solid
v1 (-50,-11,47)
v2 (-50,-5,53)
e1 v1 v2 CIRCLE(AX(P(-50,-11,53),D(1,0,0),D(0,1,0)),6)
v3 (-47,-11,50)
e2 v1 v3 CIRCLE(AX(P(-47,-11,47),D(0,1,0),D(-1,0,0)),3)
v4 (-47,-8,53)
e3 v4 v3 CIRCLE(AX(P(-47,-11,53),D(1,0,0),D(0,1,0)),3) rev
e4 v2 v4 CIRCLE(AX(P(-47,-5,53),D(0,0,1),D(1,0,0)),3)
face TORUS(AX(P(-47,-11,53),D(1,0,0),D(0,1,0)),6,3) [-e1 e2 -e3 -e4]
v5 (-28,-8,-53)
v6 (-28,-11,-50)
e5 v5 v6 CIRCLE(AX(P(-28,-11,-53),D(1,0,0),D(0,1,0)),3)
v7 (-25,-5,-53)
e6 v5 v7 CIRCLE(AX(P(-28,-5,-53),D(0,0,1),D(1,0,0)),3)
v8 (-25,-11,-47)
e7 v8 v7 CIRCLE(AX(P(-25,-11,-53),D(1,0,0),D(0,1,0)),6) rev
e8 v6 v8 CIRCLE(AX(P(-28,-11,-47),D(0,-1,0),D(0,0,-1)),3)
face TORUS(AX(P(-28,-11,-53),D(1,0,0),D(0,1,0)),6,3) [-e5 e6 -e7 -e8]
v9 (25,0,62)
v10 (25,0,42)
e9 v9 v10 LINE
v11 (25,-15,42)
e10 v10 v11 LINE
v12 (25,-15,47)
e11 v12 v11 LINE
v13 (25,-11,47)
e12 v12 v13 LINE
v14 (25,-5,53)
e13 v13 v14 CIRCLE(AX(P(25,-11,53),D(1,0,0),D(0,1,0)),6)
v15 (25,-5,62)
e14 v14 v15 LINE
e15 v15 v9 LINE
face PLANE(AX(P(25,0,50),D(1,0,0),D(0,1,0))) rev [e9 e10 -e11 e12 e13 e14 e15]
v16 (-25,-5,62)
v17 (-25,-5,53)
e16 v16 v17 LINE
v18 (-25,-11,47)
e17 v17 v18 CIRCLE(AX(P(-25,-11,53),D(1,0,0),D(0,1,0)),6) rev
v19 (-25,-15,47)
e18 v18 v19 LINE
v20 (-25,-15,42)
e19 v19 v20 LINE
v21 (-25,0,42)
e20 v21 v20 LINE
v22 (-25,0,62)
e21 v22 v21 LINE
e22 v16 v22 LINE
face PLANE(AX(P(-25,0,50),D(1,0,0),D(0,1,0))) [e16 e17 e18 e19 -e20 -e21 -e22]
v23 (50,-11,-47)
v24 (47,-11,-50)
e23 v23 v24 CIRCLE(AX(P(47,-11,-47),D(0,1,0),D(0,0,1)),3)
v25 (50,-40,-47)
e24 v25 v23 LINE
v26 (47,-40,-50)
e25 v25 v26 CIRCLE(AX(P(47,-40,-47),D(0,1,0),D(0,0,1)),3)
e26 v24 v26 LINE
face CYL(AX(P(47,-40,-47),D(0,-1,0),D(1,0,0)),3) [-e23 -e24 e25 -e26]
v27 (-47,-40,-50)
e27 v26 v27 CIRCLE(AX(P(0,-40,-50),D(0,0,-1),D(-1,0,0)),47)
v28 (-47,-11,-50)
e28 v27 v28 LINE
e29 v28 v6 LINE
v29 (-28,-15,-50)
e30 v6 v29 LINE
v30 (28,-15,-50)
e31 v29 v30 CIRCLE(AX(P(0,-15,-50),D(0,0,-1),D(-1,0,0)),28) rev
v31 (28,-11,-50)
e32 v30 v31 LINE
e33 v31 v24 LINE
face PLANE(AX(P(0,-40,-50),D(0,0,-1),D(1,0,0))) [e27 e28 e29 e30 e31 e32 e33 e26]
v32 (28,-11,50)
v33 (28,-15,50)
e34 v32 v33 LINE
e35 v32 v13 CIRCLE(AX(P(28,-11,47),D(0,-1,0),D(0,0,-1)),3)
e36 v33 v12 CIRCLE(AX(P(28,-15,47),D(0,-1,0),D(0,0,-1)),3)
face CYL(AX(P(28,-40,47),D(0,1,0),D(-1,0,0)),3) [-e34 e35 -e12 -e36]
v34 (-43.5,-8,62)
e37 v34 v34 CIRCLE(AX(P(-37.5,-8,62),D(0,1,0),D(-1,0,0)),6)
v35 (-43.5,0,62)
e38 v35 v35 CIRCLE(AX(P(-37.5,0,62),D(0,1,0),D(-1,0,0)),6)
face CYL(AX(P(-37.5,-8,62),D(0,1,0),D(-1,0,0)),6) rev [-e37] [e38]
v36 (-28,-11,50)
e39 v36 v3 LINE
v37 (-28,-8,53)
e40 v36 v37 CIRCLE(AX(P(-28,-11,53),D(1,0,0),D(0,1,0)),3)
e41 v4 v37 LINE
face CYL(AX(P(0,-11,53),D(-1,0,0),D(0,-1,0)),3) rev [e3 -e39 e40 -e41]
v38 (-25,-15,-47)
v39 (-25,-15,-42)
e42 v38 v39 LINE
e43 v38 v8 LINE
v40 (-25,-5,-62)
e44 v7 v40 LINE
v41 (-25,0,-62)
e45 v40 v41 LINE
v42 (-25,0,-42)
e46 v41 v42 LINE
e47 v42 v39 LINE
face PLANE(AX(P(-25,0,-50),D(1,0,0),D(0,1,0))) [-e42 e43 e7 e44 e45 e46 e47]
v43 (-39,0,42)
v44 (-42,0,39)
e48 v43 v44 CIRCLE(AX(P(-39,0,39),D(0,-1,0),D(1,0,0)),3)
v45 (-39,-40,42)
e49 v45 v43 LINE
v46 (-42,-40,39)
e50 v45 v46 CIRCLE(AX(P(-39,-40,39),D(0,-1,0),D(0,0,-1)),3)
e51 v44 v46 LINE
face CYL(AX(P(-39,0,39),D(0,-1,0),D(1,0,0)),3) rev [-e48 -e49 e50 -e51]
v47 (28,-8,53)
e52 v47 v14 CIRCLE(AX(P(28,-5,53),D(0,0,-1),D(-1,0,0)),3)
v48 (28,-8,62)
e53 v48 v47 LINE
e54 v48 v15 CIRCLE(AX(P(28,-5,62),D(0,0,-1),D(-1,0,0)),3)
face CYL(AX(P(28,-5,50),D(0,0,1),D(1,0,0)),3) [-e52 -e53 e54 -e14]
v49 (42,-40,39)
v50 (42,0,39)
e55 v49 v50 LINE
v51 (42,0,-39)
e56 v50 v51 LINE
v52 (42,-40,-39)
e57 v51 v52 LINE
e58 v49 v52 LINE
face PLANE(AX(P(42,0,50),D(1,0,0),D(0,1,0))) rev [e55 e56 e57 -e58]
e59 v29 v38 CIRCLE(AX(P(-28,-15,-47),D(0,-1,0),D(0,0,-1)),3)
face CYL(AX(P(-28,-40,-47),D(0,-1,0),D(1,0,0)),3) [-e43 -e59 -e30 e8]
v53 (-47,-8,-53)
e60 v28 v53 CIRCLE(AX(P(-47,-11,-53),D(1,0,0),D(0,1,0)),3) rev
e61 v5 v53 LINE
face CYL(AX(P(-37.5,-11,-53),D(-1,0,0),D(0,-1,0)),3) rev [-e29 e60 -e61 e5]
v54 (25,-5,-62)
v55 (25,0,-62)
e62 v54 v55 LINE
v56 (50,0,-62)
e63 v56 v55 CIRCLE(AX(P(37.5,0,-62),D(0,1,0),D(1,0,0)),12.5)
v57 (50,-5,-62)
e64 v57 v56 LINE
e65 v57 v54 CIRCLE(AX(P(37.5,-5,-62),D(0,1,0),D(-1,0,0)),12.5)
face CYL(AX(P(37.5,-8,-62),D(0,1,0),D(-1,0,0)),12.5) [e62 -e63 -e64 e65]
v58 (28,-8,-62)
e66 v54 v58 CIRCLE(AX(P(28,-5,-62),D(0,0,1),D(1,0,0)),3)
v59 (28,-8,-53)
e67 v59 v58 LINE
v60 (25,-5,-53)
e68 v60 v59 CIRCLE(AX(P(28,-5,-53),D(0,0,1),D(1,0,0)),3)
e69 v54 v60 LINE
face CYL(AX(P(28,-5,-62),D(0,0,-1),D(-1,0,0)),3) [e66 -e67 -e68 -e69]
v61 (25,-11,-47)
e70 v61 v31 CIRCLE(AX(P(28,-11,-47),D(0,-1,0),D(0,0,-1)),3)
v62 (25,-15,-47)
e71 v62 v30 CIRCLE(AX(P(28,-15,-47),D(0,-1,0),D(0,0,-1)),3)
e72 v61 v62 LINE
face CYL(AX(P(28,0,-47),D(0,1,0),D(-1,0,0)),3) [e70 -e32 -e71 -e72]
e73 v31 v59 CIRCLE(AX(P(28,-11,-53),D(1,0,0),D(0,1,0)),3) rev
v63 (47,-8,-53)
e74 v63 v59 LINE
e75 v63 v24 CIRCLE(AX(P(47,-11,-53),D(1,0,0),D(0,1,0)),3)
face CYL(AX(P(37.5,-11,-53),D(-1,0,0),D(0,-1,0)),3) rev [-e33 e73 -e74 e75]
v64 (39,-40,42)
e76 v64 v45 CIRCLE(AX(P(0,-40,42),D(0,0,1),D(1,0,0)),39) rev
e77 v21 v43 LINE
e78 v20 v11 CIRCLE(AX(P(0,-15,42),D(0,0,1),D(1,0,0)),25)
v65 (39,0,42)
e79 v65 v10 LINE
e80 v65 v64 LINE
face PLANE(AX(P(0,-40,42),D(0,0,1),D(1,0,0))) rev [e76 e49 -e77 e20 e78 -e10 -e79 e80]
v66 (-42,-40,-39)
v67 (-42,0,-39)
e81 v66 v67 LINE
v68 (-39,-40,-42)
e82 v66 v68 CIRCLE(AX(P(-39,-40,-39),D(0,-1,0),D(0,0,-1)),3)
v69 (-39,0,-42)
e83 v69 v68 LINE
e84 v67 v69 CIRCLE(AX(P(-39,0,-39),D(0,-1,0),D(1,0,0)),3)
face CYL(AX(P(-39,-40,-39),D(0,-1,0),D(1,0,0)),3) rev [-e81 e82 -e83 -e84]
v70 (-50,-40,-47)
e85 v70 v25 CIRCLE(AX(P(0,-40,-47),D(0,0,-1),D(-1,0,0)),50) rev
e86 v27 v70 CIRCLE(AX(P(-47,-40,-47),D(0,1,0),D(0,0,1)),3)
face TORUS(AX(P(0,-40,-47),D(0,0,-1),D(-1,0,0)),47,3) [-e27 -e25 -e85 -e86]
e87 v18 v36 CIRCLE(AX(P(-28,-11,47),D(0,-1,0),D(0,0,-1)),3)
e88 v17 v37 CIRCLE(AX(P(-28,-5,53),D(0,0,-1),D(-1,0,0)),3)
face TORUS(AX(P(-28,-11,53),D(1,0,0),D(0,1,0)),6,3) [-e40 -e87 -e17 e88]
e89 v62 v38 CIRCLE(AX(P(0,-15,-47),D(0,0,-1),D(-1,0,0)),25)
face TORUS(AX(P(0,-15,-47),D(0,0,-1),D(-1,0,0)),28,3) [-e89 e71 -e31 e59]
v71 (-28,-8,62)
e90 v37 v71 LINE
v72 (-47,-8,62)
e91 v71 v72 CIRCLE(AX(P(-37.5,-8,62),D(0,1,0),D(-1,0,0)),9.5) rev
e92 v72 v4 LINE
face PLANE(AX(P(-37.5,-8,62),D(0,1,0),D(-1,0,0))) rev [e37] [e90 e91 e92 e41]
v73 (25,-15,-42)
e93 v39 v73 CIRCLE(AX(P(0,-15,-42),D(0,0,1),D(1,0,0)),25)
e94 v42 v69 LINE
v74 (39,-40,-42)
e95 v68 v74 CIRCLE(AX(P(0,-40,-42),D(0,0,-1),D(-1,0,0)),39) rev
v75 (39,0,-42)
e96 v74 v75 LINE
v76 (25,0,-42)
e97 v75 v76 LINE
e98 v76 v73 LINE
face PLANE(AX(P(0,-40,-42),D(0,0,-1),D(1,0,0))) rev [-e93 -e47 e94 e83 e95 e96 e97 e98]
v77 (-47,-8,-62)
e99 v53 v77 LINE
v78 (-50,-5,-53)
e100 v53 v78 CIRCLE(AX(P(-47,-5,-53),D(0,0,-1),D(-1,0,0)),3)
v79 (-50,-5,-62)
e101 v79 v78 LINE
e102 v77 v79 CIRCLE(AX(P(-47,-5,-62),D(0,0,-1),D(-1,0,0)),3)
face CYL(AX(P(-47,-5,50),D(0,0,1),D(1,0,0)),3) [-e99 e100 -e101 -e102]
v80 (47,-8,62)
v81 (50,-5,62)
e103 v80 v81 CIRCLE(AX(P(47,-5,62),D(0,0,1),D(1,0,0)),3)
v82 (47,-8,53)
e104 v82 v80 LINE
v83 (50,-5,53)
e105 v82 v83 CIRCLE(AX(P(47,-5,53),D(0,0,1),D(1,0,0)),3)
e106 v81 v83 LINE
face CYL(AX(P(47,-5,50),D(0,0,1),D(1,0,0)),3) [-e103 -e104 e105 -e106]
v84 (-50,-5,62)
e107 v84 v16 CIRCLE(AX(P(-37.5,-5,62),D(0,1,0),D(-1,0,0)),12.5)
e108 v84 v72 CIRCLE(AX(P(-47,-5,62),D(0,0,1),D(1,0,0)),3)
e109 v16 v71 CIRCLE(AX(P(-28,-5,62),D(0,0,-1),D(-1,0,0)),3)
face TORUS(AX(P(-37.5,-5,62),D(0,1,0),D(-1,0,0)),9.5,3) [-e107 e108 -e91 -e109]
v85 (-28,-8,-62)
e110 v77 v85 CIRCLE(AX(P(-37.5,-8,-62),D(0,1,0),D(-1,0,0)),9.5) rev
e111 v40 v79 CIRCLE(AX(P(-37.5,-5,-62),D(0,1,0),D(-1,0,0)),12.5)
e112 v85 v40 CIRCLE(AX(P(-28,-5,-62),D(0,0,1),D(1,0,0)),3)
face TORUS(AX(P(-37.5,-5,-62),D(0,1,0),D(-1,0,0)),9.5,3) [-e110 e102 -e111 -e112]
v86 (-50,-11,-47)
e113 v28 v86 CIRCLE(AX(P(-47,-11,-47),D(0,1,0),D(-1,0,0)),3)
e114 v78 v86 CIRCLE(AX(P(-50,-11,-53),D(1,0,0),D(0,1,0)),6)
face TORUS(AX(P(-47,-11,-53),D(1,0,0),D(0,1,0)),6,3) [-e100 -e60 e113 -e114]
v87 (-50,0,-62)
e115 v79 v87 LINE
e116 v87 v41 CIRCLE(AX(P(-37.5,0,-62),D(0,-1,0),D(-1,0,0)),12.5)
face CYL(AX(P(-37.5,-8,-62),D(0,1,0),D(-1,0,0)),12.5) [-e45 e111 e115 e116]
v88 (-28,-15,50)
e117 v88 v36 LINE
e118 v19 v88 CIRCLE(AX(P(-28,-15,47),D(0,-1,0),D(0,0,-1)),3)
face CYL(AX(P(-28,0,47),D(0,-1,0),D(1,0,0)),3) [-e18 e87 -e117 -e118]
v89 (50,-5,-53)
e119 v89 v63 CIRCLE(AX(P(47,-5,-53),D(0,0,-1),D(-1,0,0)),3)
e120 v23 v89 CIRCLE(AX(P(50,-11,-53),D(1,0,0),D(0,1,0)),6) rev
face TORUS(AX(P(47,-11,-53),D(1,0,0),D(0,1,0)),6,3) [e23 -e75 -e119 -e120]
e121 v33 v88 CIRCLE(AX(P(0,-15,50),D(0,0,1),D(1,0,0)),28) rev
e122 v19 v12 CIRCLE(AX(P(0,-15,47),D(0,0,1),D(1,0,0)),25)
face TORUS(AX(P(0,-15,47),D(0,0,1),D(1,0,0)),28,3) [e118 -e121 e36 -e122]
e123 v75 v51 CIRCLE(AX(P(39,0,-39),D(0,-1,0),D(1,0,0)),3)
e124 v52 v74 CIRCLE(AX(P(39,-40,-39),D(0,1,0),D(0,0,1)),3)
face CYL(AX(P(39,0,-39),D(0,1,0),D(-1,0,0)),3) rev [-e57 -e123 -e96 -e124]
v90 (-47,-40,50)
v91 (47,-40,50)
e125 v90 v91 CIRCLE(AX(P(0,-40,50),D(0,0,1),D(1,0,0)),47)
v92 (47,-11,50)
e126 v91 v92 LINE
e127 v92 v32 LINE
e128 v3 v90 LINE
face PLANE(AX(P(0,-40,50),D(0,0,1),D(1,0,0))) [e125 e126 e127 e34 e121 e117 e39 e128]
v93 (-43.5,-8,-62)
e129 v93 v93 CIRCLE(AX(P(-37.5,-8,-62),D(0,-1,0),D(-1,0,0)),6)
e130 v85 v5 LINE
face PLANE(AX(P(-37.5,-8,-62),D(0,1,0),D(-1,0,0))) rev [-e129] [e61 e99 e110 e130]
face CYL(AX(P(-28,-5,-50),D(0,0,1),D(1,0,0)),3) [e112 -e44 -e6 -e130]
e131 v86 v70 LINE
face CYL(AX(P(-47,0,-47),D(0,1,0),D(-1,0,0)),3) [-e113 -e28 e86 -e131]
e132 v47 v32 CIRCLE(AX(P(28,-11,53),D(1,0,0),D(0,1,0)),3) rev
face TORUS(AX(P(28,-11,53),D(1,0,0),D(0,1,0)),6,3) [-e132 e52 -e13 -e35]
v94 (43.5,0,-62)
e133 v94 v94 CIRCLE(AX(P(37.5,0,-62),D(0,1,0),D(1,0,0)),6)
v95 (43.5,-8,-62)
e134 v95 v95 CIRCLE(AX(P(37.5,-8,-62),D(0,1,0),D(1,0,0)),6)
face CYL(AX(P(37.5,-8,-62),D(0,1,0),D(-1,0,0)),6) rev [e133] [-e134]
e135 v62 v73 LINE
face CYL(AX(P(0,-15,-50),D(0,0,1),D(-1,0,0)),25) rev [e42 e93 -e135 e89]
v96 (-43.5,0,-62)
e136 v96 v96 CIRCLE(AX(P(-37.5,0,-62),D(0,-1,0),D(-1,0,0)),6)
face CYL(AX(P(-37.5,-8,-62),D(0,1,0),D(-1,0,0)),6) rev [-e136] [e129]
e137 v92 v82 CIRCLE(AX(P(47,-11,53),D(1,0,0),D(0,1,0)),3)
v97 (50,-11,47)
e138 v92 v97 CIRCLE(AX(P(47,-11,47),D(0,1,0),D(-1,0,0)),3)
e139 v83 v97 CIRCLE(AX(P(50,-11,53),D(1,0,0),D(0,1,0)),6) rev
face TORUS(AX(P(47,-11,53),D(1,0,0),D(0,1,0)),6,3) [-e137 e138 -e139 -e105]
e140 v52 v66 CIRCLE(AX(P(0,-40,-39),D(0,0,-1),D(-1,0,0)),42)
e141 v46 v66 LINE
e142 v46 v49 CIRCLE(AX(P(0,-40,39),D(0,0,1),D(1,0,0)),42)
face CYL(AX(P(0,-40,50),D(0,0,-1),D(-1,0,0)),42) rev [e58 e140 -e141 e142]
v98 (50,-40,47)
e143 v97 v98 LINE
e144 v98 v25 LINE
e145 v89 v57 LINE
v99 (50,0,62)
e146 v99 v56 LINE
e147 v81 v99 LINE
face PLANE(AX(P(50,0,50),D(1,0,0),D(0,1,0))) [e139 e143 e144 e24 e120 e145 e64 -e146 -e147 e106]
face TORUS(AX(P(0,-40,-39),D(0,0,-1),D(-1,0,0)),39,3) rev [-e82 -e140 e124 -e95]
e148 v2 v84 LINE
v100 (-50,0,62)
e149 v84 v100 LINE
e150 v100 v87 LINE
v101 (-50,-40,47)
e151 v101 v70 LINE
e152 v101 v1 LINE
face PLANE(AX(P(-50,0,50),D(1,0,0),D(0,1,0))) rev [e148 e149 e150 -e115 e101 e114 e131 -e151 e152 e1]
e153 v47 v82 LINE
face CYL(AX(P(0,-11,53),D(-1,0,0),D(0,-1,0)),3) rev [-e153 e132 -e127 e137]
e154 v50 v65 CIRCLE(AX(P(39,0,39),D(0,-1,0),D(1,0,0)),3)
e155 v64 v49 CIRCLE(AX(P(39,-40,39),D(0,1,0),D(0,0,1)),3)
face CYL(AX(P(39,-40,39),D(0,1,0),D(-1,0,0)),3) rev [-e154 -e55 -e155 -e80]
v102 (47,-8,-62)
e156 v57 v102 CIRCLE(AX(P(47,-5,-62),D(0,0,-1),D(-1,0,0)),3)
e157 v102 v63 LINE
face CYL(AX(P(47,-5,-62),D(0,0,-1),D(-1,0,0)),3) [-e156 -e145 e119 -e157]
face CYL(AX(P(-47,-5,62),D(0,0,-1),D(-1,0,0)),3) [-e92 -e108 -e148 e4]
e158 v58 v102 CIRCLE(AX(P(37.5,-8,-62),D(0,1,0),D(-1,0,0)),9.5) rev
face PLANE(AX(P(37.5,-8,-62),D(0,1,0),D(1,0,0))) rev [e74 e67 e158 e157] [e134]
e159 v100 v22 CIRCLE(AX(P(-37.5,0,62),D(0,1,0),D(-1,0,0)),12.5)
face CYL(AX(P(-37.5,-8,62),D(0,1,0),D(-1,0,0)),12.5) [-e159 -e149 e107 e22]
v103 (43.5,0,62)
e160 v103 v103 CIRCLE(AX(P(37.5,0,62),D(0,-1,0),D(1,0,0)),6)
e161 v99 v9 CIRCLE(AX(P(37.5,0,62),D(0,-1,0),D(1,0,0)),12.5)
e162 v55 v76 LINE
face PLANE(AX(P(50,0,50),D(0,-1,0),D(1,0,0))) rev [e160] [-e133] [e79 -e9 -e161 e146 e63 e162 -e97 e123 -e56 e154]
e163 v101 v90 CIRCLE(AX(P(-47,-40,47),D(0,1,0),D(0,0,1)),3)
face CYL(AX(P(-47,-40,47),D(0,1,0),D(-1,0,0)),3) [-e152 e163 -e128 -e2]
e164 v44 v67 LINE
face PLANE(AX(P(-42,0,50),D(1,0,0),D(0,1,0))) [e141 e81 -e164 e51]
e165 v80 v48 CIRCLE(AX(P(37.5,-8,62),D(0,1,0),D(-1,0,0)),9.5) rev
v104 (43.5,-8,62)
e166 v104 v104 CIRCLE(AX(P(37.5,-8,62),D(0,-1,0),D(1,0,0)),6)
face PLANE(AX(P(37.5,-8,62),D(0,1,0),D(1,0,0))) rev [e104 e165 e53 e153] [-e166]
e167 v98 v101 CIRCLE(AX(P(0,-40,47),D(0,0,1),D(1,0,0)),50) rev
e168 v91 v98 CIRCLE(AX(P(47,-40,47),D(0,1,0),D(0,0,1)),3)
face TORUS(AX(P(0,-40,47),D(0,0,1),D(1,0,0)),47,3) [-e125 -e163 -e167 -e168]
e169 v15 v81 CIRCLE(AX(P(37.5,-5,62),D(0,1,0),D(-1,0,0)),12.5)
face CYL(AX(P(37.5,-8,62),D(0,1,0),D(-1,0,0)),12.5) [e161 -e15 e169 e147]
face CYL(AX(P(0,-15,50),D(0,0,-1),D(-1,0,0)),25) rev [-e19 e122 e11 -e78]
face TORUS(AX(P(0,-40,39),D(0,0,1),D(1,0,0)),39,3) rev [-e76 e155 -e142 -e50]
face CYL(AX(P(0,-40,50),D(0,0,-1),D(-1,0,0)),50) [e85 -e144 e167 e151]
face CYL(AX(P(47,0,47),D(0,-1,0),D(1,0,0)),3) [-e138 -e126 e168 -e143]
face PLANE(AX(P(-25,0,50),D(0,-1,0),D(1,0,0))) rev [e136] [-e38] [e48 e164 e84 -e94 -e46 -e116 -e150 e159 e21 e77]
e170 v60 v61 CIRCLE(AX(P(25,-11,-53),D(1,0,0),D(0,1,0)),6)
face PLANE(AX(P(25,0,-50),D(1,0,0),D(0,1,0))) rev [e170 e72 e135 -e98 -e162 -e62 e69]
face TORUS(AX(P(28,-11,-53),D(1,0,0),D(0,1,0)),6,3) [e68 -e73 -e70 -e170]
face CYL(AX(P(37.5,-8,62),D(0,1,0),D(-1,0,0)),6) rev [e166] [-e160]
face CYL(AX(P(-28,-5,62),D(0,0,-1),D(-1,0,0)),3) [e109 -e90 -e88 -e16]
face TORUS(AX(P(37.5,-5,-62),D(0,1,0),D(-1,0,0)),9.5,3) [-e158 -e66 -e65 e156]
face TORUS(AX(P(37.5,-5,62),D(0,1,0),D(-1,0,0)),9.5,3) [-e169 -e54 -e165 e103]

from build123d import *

# Parameters (mm, degrees)
BASE_EXTRUDE_DEPTH  = 50
SHELL1_DEPTH        = 42
SKETCH2_R           = 6
BOSS_EXTRUDE1_DEPTH = 8
FILLET1_R           = 3
FILLET2_R           = 3


# Read off the part's stored shape, not the designer's step: Shell1
with BuildPart() as part:
    # Sketch1 → Base-Extrude (new body)
    with BuildSketch(Plane.XY):
        with BuildLine():
            Line((50, 0), (25, 0))
            Line((25, 0), (25, -15))
            ThreePointArc((25, -15), (0, -40), (-25, -15))
            Line((-25, -15), (-25, 0))
            Line((-25, 0), (-50, 0))
            Line((-50, 0), (-50, -40))
            ThreePointArc((-50, -40), (0, -90), (50, -40))
            Line((50, -40), (50, 0))
        make_face()
    extrude(amount=BASE_EXTRUDE_DEPTH)

    # Shell1 outline → Shell1 (cut)
    with BuildSketch(Plane.XY):
        with BuildLine():
            Line((-42, 0), (-42, -40))
            ThreePointArc((-42, -40), (0, -82), (42, -40))
            Line((42, -40), (42, 0))
            Line((42, 0), (25, 0))
            Line((25, 0), (25, -15))
            ThreePointArc((25, -15), (0, -40), (-25, -15))
            Line((-25, -15), (-25, 0))
            Line((-25, 0), (-42, 0))
        make_face()
    extrude(amount=SHELL1_DEPTH, mode=Mode.SUBTRACT)

    # Sketch2 → Boss-Extrude1 (add)
    with BuildSketch(Plane(origin=(0, 0, 0), x_dir=(-1, 0, 0), z_dir=(0, 1, 0))):
        with BuildLine():
            Line((25, 42), (50, 42))
            Line((50, 42), (50, 62))
            ThreePointArc((50, 62), (37.5, 74.5), (25, 62))
            Line((25, 62), (25, 42))
        make_face()
        with Locations((37.5, 62)):
            Circle(SKETCH2_R, mode=Mode.SUBTRACT)
    boss_extrude1 = extrude(amount=-BOSS_EXTRUDE1_DEPTH)

    # Mirror1: Boss-Extrude1 across plane
    add(boss_extrude1.mirror(Plane(origin=(0, 0, 0), x_dir=(0, 0, 1), z_dir=(1, 0, 0))))

    # Boss-Mirror1: part across face


with BuildPart() as part_1:
    add(part.part)
    add(part.part.mirror(Plane(origin=(0, -51.77064839, 0), x_dir=(1, 0, 0), z_dir=(0, 0, -1))))

    # Fillet1
    fillet1_edges = [part_1.edges().sort_by_distance(p)[0] for p in [
        (42, -20, -42),
        (-42, -20, -42),
        (0, -82, -42),
        (-37.5, -8, -50),
        (37.5, -8, -50),
        (42, -20, 42),
        (-42, -20, 42),
        (0, -82, 42),
        (-37.5, -8, 50),
        (37.5, -8, 50),
    ]]
    fillet(fillet1_edges, radius=FILLET1_R)

    # Fillet2
    fillet2_edges = [part_1.edges().sort_by_distance(p)[0] for p in [
        (0, -90, 50),
        (-37.5, -8, -74.5),
        (50, -8, -57.5),
        (37.5, -8, -74.5),
        (50, -25.5, 50),
        (25, -13, 50),
        (-25, -13, 50),
        (-50, -25.5, 50),
        (25, -8, 57.5),
        (-25, -8, 57.5),
        (25, -8, -57.5),
        (50, -25.5, -50),
        (-50, -25.5, -50),
        (-25, -13, -50),
        (25, -13, -50),
        (-25, -8, -57.5),
        (25, -8.878679656, 50.878679656),
        (50, -8.878679656, 50.878679656),
        (-50, -8.878679656, 50.878679656),
        (-25, -8.878679656, 50.878679656),
        (25, -8.878679656, -50.878679656),
        (50, -8.878679656, -50.878679656),
        (-50, -8.878679656, -50.878679656),
        (-25, -8.878679656, -50.878679656),
        (0, -40, 50),
        (-37.5, -8, 74.5),
        (-50, -8, 57.5),
        (37.5, -8, 74.5),
        (50, -8, 57.5),
        (0, -40, -50),
        (-50, -8, -57.5),
        (0, -90, -50),
    ]]
    fillet(fillet2_edges, radius=FILLET2_R)


solid = part_1.part
